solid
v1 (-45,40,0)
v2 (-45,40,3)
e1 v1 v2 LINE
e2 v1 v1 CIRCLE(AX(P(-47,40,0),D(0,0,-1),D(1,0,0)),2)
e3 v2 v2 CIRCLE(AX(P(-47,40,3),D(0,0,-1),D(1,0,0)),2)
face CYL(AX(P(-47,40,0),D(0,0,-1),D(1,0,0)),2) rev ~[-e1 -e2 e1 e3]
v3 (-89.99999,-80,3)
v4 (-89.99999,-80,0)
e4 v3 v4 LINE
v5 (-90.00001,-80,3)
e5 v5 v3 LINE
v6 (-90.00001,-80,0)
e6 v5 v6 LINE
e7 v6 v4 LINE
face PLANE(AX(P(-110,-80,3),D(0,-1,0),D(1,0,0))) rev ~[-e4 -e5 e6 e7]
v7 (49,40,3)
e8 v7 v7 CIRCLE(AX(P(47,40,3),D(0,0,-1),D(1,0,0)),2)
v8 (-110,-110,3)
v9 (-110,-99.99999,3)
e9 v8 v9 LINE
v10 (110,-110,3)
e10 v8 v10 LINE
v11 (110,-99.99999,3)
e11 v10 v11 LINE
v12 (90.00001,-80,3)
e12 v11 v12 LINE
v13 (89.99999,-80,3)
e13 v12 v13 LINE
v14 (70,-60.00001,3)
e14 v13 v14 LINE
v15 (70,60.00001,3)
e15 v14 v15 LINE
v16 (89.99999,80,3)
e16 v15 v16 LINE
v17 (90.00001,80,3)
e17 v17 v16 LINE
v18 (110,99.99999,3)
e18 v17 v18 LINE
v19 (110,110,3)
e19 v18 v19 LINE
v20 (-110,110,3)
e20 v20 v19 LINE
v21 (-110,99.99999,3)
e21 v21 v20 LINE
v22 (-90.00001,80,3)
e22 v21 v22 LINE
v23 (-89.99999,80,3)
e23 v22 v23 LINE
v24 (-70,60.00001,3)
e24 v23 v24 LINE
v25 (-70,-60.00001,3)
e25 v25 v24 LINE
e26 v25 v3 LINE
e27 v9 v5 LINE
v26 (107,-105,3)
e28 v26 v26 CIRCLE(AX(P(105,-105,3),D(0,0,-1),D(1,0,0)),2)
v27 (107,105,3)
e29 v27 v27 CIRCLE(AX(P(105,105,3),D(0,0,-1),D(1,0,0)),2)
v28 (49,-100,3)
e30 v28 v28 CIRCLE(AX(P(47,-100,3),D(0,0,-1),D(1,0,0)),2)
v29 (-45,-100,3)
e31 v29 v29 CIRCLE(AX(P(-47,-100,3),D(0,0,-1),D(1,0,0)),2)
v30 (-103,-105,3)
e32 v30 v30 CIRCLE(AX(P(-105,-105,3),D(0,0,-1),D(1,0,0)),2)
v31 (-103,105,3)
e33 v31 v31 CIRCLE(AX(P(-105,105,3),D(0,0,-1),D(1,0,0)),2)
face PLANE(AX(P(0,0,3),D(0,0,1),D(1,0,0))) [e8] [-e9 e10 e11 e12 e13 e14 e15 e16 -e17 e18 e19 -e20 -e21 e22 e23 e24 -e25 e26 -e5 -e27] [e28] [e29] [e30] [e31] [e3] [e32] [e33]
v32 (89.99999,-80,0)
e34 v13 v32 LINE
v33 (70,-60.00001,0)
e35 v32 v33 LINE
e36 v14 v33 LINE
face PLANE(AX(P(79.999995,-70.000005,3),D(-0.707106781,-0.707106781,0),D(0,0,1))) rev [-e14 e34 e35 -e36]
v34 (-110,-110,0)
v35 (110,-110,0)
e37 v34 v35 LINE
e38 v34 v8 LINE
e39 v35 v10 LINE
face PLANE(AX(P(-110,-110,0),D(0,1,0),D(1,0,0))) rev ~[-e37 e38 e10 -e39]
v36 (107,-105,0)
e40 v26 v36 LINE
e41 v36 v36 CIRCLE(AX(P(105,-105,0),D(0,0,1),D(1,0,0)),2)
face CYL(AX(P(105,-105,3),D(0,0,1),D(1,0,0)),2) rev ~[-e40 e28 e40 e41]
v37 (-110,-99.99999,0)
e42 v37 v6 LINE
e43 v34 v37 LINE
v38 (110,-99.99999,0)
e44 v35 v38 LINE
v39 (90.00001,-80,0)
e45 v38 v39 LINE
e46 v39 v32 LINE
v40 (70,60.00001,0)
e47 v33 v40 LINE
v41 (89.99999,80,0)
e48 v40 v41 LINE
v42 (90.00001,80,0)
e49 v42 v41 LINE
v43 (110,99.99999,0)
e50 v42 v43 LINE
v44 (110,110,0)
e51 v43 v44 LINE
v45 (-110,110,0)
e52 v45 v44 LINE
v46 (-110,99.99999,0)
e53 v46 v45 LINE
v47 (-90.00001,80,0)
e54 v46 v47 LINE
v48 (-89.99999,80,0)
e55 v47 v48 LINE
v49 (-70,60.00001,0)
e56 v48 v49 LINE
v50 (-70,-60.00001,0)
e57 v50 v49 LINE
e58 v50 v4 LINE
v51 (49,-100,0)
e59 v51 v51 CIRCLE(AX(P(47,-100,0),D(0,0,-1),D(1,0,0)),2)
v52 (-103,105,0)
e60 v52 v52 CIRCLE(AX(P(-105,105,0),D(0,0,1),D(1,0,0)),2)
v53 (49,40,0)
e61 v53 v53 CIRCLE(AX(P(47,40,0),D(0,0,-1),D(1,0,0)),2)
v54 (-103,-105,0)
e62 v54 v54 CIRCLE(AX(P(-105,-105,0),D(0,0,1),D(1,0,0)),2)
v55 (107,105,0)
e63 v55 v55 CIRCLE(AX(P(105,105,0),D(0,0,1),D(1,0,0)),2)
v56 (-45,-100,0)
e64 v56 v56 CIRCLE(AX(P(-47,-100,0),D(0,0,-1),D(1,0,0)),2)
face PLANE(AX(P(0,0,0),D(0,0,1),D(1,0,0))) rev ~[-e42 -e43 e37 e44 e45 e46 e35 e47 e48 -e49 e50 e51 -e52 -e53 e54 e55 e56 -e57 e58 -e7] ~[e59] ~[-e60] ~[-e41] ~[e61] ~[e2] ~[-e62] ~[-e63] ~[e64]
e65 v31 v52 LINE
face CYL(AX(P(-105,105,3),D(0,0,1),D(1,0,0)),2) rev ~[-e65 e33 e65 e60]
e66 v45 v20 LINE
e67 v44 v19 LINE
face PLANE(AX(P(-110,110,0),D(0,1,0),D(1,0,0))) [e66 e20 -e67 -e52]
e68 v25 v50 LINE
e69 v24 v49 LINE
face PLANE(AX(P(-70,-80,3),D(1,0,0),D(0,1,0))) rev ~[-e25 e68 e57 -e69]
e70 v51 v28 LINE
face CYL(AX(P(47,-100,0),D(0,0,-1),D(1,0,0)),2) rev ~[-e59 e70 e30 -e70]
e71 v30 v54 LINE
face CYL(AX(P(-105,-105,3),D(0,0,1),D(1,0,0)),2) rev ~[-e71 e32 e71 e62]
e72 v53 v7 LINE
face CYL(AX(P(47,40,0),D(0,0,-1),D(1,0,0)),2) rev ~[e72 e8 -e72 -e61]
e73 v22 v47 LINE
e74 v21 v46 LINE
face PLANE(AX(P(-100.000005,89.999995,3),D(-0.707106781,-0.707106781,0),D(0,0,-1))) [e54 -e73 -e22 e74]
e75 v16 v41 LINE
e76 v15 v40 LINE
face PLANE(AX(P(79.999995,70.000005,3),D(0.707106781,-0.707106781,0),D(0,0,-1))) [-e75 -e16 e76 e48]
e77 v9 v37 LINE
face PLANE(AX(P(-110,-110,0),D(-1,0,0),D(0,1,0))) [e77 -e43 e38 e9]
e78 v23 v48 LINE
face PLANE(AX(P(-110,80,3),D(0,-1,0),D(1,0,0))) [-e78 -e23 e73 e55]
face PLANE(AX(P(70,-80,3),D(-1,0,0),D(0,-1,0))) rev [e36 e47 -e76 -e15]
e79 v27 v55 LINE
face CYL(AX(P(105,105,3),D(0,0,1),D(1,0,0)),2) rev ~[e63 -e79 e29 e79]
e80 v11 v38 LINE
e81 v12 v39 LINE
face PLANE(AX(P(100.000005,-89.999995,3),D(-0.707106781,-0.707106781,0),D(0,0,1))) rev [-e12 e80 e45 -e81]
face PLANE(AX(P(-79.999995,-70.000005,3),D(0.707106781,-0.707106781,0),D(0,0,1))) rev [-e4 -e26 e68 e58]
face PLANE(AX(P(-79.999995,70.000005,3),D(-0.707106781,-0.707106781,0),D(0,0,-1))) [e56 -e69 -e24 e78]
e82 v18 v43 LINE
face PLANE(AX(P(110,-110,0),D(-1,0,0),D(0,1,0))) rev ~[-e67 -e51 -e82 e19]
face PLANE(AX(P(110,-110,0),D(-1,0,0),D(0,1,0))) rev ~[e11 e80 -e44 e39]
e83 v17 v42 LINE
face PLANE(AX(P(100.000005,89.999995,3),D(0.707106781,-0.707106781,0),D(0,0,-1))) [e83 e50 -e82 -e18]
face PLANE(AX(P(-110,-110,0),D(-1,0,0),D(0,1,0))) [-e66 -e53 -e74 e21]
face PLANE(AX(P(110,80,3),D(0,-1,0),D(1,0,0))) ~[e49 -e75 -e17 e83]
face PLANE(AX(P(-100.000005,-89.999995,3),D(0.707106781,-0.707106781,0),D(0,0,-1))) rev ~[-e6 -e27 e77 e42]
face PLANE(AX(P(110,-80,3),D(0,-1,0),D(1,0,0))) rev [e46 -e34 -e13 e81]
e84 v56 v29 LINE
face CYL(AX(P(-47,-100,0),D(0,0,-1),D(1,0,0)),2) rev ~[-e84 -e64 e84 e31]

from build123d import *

# Parameters (mm, degrees)
F0_W     = 220
F0_H     = 220
F1_DEPTH = 3
F2_W     = 40
F2_H     = 160
F2_R     = 2
F3_DEPTH = 25
F4_SIZE  = 19.99999
F5_R     = 2
F6_DEPTH = 25


# Not quite as in the source:
# - a fillet or chamfer is up to 0.001 mm smaller than in the source, because OpenCascade refuses the exact size
# - a pattern or mirror of a feature is missing from the dataset's text; its kind, count and spacing are read off the source's solid


with BuildPart() as f1:
    # F0 (on Top) → F1 (new body)
    with BuildSketch(Plane.XY):
        Rectangle(F0_W, F0_H)
    extrude(amount=F1_DEPTH)

    # F2 (on face) → F3 (cut)
    with BuildSketch(Plane.XY.offset(3)):
        with Locations((-90, 0)):
            Rectangle(F2_W, F2_H)
        with Locations((105, 105)):
            Circle(F2_R)
        with Locations((105, -105)):
            Circle(F2_R)
        with Locations((-105, 105)):
            Circle(F2_R)
        with Locations((-105, -105)):
            Circle(F2_R)
    f3 = extrude(amount=-F3_DEPTH, mode=Mode.SUBTRACT)

    # F3_copies: F3 across plane
    add(f3.mirror(Plane(origin=(0, 0, 0), x_dir=(0, 0, 1), z_dir=(1, 0, 0))), mode=Mode.SUBTRACT)

    # F4 (size 20 in the source; OpenCascade refuses exactly that, so slightly less here)
    f4_edges = [f1.edges().sort_by_distance(p)[0] for p in [
        (-110, 80, 1.5),
        (-110, -80, 1.5),
        (-70, -80, 1.5),
        (-70, 80, 1.5),
        (110, 80, 1.5),
        (70, 80, 1.5),
        (70, -80, 1.5),
        (110, -80, 1.5),
    ]]
    chamfer(f4_edges, length=F4_SIZE)

    # F5 (on face) → F6 (cut)
    with BuildSketch(Plane(origin=(0, 0, 0), x_dir=(1, 0, 0), z_dir=(0, 0, -1))):
        with Locations((-47, 100)):
            Circle(F5_R)
        with Locations((-47, -40)):
            Circle(F5_R)
        with Locations((47, -40)):
            Circle(F5_R)
        with Locations((47, 100)):
            Circle(F5_R)
    extrude(amount=-F6_DEPTH, mode=Mode.SUBTRACT)


solid = f1.part
